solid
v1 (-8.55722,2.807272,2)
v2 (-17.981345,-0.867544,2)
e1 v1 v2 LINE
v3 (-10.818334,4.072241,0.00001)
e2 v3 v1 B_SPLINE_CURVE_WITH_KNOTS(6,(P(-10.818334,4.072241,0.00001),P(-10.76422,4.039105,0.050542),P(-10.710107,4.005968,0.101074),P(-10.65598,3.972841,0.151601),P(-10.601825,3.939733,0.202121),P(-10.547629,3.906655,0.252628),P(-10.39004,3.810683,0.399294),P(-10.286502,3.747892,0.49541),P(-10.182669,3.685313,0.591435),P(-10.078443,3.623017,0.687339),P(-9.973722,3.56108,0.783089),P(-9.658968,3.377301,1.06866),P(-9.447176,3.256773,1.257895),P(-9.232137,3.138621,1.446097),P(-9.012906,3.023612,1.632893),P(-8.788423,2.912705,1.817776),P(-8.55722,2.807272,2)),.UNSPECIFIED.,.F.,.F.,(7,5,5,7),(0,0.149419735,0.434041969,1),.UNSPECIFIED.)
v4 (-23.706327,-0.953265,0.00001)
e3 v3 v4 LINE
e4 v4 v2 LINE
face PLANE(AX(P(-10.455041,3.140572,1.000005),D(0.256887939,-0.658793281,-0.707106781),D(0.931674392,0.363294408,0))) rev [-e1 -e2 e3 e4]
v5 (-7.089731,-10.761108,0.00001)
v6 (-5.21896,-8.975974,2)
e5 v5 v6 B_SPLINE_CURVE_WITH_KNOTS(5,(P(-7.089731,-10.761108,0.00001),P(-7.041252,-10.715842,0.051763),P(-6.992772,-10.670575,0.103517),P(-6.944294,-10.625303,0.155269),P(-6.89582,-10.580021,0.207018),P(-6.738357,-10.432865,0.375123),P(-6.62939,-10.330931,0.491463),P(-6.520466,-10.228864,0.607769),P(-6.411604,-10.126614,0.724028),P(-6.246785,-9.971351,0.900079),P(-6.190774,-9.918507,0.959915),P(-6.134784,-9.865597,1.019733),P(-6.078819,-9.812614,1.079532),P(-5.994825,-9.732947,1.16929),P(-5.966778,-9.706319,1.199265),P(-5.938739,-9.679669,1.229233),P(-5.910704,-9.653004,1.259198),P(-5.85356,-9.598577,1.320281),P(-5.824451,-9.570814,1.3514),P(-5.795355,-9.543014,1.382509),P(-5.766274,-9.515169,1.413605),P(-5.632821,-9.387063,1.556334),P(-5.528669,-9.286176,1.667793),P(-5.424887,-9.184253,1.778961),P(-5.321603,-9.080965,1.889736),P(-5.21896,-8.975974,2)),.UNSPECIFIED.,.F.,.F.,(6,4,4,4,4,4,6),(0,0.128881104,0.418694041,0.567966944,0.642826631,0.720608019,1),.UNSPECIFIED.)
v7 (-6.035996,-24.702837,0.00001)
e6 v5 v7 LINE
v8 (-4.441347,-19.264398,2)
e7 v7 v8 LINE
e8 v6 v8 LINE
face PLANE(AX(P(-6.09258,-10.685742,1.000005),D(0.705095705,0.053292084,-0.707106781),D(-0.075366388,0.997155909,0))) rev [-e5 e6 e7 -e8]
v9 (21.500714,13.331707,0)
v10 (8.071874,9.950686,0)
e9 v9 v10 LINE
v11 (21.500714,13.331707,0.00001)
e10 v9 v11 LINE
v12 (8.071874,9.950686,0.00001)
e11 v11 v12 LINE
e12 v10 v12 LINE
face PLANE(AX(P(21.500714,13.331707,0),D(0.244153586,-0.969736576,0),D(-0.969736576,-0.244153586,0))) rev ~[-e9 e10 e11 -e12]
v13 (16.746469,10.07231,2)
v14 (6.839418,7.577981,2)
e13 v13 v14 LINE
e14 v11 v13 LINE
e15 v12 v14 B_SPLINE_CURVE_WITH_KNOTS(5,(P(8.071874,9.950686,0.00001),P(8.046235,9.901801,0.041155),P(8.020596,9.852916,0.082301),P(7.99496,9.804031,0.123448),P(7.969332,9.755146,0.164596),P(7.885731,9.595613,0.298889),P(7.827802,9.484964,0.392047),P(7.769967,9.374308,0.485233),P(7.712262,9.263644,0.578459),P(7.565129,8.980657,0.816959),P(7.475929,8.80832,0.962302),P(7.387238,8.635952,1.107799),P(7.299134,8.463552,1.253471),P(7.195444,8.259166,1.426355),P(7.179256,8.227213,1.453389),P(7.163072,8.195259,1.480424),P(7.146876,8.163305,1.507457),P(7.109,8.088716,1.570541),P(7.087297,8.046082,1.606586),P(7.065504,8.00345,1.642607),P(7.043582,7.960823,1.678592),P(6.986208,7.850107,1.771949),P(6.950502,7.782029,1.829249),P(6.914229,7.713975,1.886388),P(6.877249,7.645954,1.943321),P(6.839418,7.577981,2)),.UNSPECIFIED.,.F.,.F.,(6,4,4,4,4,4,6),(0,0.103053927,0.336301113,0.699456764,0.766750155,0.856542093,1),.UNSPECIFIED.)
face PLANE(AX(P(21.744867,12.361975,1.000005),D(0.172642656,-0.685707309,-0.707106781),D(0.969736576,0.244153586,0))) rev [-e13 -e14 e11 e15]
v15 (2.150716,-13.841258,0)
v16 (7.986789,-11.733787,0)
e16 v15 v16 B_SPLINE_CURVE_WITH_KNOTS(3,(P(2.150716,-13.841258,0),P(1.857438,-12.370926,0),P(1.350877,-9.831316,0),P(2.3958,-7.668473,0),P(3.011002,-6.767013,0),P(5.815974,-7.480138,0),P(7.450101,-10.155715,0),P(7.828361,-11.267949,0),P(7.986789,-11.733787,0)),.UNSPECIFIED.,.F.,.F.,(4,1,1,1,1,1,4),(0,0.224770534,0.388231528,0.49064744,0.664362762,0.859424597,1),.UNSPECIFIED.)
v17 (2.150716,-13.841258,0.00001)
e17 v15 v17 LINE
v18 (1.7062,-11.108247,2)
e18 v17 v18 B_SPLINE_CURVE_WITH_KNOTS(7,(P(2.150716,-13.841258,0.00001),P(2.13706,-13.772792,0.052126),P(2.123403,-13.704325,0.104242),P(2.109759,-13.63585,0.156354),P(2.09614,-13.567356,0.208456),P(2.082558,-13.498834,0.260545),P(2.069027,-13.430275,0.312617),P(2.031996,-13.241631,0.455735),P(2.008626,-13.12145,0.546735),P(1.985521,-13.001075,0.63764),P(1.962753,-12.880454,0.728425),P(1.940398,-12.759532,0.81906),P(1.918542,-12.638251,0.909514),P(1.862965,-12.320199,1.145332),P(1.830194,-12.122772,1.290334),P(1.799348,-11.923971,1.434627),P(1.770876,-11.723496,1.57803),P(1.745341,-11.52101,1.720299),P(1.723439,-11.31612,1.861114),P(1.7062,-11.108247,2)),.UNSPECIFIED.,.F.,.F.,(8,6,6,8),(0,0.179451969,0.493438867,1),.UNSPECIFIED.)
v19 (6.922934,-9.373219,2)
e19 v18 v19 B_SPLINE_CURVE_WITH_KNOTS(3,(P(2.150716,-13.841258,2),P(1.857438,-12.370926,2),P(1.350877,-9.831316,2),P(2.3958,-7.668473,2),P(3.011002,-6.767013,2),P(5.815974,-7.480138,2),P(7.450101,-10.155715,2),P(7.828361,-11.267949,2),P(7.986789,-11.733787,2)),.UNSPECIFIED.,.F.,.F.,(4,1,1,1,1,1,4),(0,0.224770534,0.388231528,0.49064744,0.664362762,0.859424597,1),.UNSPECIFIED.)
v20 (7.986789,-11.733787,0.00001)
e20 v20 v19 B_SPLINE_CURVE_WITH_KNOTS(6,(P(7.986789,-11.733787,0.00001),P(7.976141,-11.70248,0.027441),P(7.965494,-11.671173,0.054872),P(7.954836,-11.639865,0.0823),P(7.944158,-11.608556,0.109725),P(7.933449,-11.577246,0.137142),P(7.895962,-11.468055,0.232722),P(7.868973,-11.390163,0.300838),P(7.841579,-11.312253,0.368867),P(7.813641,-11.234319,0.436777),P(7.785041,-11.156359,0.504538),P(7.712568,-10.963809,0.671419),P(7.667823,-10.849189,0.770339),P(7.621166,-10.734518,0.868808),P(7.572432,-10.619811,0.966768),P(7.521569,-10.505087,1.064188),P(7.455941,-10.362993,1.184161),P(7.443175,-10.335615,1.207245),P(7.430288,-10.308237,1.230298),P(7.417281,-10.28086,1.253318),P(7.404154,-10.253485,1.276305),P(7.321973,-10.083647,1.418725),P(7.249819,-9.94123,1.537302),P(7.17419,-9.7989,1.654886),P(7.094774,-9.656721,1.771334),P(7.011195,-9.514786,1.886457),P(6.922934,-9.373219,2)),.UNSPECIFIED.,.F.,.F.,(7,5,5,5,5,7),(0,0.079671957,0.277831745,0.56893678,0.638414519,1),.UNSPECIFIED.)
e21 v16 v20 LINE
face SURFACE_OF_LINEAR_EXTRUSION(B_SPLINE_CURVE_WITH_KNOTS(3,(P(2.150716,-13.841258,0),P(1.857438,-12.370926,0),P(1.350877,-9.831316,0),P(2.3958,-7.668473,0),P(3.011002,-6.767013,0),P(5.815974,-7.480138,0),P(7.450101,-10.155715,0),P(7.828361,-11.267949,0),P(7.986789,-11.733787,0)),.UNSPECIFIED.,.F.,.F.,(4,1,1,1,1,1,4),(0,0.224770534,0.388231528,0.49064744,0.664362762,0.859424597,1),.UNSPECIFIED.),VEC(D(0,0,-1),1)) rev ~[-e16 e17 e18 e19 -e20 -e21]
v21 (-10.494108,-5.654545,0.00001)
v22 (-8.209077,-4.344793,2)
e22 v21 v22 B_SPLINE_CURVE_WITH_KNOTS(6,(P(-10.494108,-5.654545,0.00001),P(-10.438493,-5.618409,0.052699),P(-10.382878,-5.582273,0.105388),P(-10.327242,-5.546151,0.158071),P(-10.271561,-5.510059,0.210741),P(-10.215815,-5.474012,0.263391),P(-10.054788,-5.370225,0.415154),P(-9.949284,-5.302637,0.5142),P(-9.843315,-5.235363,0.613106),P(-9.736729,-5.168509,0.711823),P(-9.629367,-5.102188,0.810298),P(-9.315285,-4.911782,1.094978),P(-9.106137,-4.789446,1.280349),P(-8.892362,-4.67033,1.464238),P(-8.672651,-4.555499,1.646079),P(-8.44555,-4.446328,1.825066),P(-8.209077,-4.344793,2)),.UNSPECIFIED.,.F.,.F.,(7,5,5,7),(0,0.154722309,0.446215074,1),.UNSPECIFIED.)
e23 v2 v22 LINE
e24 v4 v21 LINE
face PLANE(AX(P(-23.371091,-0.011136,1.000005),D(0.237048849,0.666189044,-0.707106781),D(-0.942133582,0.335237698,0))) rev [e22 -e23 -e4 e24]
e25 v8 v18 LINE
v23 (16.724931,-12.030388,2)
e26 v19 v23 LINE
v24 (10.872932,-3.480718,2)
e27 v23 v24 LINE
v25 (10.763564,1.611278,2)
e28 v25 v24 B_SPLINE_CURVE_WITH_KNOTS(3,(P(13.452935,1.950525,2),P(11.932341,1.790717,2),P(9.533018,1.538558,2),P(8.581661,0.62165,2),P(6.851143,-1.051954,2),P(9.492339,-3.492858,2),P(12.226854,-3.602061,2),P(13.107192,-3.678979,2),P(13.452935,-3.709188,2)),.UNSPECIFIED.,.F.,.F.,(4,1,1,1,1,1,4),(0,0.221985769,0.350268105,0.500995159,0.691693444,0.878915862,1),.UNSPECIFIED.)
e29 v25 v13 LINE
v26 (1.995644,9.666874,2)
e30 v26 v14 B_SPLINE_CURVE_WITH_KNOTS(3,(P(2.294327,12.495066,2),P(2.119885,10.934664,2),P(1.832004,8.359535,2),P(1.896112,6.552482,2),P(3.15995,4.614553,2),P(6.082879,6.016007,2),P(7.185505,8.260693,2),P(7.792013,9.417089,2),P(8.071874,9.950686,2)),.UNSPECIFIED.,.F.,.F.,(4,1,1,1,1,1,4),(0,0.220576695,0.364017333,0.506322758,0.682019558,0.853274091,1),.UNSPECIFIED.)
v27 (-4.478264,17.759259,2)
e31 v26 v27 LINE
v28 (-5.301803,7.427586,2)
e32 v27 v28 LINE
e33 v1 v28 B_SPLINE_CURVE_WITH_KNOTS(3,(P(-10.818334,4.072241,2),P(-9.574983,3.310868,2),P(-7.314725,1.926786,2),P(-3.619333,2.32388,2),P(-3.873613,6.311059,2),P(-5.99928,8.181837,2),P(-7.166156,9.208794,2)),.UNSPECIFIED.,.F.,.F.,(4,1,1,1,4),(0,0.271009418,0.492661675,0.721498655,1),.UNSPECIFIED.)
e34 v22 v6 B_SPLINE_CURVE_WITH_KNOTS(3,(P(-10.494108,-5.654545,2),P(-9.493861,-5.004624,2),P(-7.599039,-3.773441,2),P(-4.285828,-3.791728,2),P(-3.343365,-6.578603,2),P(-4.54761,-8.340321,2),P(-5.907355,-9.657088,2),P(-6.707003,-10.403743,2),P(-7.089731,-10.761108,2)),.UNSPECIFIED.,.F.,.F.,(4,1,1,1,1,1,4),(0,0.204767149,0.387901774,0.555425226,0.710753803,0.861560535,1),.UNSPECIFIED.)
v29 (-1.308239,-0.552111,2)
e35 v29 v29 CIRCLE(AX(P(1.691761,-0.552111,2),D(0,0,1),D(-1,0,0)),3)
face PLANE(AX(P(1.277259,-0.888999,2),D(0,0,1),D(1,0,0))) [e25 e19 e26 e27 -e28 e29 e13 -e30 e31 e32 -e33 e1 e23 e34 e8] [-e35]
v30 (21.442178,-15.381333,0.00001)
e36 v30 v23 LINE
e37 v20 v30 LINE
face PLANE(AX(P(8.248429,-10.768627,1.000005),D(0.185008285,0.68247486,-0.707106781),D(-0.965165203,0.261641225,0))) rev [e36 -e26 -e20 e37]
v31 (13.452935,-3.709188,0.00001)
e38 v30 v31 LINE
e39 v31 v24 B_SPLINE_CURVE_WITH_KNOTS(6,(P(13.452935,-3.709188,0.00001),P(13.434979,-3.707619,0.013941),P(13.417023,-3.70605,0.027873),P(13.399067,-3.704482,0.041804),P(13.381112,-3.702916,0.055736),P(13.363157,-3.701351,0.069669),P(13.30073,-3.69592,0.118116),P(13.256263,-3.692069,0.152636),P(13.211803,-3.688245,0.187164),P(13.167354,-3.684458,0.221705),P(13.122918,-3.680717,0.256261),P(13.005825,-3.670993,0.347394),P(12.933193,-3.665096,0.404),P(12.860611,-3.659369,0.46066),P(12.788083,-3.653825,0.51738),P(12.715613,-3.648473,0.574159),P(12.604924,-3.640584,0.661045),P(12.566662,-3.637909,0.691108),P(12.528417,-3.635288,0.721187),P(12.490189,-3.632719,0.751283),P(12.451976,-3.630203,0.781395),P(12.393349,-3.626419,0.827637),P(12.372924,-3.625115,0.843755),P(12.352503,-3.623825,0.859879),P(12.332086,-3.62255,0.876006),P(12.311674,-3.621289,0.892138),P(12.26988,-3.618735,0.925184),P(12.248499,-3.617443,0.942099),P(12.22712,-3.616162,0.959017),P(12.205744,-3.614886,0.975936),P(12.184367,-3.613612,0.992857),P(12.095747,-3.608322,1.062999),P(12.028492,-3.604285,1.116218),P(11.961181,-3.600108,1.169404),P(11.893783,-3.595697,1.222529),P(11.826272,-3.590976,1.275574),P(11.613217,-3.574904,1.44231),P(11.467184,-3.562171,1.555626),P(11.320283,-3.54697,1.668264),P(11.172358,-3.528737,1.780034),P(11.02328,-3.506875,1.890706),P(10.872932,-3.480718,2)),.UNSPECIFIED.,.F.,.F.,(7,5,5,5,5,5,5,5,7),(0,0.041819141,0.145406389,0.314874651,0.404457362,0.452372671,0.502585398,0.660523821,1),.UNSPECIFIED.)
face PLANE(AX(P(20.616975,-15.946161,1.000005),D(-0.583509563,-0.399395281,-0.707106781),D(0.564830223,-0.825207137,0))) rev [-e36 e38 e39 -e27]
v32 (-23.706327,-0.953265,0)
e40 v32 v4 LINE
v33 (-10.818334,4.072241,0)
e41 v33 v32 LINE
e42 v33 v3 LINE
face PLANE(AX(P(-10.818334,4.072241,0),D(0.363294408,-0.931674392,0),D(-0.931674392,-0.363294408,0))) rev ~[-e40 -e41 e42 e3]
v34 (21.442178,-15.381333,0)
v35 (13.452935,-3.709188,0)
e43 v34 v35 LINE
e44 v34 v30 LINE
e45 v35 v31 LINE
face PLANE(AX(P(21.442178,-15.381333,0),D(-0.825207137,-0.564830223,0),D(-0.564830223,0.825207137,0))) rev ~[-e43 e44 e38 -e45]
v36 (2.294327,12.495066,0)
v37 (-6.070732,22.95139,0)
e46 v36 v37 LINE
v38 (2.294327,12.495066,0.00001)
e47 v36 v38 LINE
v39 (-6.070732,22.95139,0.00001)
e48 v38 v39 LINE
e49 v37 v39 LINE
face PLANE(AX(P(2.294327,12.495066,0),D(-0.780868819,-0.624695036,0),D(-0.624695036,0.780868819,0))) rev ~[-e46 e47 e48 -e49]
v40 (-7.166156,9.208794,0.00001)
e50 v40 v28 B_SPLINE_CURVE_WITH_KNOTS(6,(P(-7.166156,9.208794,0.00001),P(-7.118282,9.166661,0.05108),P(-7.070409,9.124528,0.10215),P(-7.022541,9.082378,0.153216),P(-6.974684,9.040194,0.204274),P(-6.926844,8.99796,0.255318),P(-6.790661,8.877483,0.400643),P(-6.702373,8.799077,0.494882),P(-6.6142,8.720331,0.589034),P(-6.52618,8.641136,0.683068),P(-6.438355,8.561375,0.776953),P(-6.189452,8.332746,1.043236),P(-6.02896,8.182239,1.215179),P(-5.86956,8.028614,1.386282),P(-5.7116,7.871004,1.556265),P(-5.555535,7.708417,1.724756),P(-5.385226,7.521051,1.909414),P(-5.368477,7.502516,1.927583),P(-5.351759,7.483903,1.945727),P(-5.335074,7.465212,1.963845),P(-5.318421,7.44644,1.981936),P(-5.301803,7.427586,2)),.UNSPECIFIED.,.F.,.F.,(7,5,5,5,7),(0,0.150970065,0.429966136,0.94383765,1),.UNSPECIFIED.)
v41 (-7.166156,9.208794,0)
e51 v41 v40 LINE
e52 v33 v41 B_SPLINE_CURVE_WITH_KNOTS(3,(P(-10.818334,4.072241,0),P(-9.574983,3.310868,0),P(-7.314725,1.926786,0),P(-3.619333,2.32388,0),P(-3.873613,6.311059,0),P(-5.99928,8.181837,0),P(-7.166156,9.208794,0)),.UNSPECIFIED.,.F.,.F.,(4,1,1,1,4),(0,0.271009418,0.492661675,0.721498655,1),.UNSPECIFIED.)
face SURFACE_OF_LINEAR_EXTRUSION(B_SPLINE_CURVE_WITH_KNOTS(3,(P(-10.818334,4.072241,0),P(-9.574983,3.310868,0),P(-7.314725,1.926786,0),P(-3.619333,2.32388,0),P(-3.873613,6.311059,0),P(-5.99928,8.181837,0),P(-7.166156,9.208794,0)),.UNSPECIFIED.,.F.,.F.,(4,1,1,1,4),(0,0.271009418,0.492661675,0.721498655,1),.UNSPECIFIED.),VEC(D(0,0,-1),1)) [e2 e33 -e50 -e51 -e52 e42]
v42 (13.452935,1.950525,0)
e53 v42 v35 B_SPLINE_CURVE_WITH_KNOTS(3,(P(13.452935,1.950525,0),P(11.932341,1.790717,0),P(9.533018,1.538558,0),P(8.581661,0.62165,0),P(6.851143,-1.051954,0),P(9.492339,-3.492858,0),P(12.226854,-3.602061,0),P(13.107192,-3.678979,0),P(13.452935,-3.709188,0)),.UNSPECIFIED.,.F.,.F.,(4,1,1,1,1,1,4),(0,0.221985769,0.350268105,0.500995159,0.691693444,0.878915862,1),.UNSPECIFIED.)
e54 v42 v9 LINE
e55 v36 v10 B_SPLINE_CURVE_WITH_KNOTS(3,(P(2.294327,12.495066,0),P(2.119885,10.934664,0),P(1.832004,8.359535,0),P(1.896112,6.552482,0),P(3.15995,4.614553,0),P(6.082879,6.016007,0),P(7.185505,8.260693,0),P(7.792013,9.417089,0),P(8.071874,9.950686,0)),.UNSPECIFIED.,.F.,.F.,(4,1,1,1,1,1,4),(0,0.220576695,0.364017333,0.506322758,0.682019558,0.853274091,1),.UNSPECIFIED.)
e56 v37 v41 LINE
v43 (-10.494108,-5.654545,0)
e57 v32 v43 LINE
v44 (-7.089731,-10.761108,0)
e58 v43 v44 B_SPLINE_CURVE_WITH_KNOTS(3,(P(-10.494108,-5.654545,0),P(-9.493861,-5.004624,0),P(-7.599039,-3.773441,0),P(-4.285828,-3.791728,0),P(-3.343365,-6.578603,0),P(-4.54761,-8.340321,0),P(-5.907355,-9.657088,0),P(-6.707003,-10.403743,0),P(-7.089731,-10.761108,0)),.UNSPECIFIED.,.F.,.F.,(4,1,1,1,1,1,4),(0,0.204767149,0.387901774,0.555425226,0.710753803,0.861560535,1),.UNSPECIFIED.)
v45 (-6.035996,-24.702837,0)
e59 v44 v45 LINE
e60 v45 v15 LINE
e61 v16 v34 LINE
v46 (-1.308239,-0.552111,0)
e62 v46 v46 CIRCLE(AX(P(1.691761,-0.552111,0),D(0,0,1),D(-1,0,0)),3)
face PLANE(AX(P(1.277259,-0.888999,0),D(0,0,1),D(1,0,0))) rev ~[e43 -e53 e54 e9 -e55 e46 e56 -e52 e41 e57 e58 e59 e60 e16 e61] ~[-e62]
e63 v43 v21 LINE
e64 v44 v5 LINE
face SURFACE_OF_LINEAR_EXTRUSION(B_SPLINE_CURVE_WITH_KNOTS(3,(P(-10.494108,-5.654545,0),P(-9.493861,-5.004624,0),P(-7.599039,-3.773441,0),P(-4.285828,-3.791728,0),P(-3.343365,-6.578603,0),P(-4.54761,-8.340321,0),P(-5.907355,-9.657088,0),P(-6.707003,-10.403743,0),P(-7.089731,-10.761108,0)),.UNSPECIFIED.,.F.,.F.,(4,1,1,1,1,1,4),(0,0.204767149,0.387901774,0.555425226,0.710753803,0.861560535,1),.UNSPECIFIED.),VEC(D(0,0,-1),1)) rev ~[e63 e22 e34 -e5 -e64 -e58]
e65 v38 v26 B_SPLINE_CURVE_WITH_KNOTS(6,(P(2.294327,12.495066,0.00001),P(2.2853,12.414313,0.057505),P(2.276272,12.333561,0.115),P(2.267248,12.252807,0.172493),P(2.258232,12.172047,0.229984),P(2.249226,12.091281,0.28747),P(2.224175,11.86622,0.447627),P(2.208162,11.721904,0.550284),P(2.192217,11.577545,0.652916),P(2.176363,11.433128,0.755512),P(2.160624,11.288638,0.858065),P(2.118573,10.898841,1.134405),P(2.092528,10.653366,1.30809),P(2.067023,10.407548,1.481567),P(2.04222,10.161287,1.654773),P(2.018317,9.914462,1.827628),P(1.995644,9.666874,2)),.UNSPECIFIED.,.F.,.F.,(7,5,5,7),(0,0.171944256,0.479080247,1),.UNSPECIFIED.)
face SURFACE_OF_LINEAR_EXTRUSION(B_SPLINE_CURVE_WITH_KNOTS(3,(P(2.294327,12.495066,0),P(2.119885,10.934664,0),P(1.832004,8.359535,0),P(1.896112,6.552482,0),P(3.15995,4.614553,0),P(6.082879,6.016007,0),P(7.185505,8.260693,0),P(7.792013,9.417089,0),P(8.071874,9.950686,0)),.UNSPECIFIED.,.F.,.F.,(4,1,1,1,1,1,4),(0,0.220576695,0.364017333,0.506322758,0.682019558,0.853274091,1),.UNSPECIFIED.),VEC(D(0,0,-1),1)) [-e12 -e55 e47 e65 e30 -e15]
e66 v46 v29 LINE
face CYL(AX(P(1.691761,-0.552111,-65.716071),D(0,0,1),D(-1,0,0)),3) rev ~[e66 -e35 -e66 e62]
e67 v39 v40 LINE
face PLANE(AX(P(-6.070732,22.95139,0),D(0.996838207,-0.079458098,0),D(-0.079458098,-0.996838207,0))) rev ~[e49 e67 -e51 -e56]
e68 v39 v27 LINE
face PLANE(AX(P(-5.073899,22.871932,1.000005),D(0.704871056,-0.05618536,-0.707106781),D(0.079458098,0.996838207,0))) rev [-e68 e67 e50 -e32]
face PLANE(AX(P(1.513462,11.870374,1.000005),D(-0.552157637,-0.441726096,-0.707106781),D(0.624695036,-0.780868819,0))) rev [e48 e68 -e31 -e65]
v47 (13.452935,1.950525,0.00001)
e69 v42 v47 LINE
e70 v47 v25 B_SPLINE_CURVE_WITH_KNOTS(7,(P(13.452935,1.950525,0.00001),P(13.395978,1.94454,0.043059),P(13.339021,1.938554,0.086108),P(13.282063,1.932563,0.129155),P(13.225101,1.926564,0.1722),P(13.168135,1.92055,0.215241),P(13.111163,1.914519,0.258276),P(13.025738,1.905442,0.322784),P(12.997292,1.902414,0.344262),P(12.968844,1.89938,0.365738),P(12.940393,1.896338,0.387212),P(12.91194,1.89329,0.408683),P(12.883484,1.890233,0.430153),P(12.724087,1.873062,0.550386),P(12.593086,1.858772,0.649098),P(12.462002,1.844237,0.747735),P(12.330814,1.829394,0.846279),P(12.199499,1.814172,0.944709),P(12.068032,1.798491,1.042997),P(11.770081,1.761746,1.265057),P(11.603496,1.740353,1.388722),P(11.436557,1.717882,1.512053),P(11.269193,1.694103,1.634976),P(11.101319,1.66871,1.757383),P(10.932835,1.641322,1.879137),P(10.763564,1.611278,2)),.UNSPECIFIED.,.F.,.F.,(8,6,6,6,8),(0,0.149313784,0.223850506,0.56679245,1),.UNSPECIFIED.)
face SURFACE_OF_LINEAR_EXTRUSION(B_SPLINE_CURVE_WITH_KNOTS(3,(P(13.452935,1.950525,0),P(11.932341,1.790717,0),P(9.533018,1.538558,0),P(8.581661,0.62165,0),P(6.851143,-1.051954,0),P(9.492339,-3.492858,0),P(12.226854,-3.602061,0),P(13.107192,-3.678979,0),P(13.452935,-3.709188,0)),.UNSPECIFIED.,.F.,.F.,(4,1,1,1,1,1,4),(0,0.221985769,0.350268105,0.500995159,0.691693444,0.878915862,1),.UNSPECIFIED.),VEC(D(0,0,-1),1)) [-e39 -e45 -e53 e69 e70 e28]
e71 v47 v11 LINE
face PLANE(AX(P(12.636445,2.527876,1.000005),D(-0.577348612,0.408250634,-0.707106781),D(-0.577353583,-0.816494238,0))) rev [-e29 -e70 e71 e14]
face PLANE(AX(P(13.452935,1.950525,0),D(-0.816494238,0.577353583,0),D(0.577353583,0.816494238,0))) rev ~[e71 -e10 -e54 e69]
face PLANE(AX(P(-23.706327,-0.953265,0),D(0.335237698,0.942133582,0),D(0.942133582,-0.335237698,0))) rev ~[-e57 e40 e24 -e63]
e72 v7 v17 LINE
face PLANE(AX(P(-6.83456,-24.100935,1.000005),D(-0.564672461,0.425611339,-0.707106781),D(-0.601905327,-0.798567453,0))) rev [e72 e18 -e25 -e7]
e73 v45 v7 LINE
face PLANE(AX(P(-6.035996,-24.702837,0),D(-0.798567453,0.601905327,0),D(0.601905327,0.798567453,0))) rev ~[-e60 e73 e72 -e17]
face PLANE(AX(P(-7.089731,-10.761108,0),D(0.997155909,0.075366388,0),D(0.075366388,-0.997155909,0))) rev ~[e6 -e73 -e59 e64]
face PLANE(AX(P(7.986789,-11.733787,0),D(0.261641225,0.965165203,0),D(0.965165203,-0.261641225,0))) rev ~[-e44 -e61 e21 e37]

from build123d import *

# Parameters (mm, degrees)
F1_DEPTH = 2
F2_SIZE  = 1.99999
F4_D     = 6


# Not quite as in the source:
# - a fillet or chamfer is up to 0.001 mm smaller than in the source, because OpenCascade refuses the exact size


with BuildPart() as f1:
    # F0 (on Top) → F1 (new body)
    with BuildSketch(Plane.XY):
        with BuildLine():
            Line((-6.070732047, 22.9513901076), (-7.1661561031, 9.2087939751))
            add(Edge.make_bspline(
                [(-10.8183338371, 4.072241369), (-9.5749830205, 3.3108681768), (-7.3147246833, 1.9267856777), (-3.6193330593, 2.323879706), (-3.8736126343, 6.3110586072), (-5.9992796786, 8.181837424), (-7.1661561031, 9.2087939751)],
                knots=[0, 0, 0, 0, 0.2710094176, 0.4926616748, 0.721498655, 1, 1, 1, 1], degree=3))
            Line((-10.8183338371, 4.072241369), (-23.7063266087, -0.9532651191))
            Line((-23.7063266087, -0.9532651191), (-10.4941075873, -5.6545452478))
            add(Edge.make_bspline(
                [(-10.4941075873, -5.6545452478), (-9.4938612527, -5.0046237284), (-7.5990391104, -3.7734413255), (-4.2858275376, -3.7917280391), (-3.3433653275, -6.5786033893), (-4.5476101592, -8.3403208195), (-5.9073550155, -9.6570884675), (-6.7070025438, -10.4037433444), (-7.0897310874, -10.7611084628)],
                knots=[0, 0, 0, 0, 0.2047671487, 0.3879017737, 0.5554252257, 0.7107538026, 0.8615605352, 1, 1, 1, 1], degree=3))
            Line((-7.0897310874, -10.7611084628), (-6.0359964333, -24.702837204))
            Line((-6.0359964333, -24.702837204), (2.1507161547, -13.8412582744))
            add(Edge.make_bspline(
                [(2.1507161547, -13.8412582744), (1.857437852, -12.3709258177), (1.3508773092, -9.8313161697), (2.3957995803, -7.6684734808), (3.0110019697, -6.7670125475), (5.8159743775, -7.4801379246), (7.4501009355, -10.1557150048), (7.8283613318, -11.2679488073), (7.9867886511, -11.7337872122)],
                knots=[0, 0, 0, 0, 0.2247705341, 0.3882315284, 0.4906474402, 0.664362762, 0.8594245965, 1, 1, 1, 1], degree=3))
            Line((7.9867886511, -11.7337872122), (21.4421775791, -15.3813331802))
            Line((21.4421775791, -15.3813331802), (13.4529346897, -3.7091881875))
            add(Edge.make_bspline(
                [(13.4529346897, 1.9505254996), (11.9323407983, 1.79071702), (9.5330178877, 1.5385575522), (8.581661333, 0.6216498394), (6.8511425341, -1.0519539126), (9.4923390362, -3.4928584716), (12.2268542531, -3.6020610918), (13.107191535, -3.6789793538), (13.4529346897, -3.7091881875)],
                knots=[0, 0, 0, 0, 0.2219857691, 0.3502681055, 0.5009951592, 0.691693444, 0.8789158616, 1, 1, 1, 1], degree=3))
            Line((13.4529346897, 1.9505254996), (21.5007144708, 13.33170683))
            Line((21.5007144708, 13.33170683), (8.0718742184, 9.9506860604))
            add(Edge.make_bspline(
                [(2.294327212, 12.4950657049), (2.1198852992, 10.9346638034), (1.8320041162, 8.3595352793), (1.8961121506, 6.5524820747), (3.1599495173, 4.614552865), (6.0828787964, 6.0160070097), (7.1855048229, 8.2606927811), (7.7920128495, 9.4170893061), (8.0718742184, 9.9506860604)],
                knots=[0, 0, 0, 0, 0.2205766948, 0.364017333, 0.5063227579, 0.6820195585, 0.8532740908, 1, 1, 1, 1], degree=3))
            Line((2.294327212, 12.4950657049), (-6.070732047, 22.9513901076))
        make_face()
    extrude(amount=F1_DEPTH)

    # F2 (size 2 in the source; OpenCascade refuses exactly that, so slightly less here)
    f2_edges = [f1.edges().sort_by_distance(p)[0] for p in [
        (-1.888202, 17.723228, 2),
        (-6.618444, 16.080092, 2),
        (17.476825, 7.641116, 2),
        (14.786294, 11.641196, 2),
        (17.447556, -9.545261, 2),
        (14.714483, -13.55756, 2),
        (-1.94264, -19.272048, 2),
        (-6.562864, -17.731973, 2),
        (-17.100217, -3.303905, 2),
        (-17.26233, 1.559488, 2),
    ]]
    chamfer(f2_edges, length=F2_SIZE)

    # F4 (through all)
    with Locations(Plane(origin=(0, 0, 0), x_dir=(1, 0, 0), z_dir=(0, 0, -1))):
        with Locations((1.6917608845, 0.5521112873)):
            Hole(F4_D / 2)


solid = f1.part
